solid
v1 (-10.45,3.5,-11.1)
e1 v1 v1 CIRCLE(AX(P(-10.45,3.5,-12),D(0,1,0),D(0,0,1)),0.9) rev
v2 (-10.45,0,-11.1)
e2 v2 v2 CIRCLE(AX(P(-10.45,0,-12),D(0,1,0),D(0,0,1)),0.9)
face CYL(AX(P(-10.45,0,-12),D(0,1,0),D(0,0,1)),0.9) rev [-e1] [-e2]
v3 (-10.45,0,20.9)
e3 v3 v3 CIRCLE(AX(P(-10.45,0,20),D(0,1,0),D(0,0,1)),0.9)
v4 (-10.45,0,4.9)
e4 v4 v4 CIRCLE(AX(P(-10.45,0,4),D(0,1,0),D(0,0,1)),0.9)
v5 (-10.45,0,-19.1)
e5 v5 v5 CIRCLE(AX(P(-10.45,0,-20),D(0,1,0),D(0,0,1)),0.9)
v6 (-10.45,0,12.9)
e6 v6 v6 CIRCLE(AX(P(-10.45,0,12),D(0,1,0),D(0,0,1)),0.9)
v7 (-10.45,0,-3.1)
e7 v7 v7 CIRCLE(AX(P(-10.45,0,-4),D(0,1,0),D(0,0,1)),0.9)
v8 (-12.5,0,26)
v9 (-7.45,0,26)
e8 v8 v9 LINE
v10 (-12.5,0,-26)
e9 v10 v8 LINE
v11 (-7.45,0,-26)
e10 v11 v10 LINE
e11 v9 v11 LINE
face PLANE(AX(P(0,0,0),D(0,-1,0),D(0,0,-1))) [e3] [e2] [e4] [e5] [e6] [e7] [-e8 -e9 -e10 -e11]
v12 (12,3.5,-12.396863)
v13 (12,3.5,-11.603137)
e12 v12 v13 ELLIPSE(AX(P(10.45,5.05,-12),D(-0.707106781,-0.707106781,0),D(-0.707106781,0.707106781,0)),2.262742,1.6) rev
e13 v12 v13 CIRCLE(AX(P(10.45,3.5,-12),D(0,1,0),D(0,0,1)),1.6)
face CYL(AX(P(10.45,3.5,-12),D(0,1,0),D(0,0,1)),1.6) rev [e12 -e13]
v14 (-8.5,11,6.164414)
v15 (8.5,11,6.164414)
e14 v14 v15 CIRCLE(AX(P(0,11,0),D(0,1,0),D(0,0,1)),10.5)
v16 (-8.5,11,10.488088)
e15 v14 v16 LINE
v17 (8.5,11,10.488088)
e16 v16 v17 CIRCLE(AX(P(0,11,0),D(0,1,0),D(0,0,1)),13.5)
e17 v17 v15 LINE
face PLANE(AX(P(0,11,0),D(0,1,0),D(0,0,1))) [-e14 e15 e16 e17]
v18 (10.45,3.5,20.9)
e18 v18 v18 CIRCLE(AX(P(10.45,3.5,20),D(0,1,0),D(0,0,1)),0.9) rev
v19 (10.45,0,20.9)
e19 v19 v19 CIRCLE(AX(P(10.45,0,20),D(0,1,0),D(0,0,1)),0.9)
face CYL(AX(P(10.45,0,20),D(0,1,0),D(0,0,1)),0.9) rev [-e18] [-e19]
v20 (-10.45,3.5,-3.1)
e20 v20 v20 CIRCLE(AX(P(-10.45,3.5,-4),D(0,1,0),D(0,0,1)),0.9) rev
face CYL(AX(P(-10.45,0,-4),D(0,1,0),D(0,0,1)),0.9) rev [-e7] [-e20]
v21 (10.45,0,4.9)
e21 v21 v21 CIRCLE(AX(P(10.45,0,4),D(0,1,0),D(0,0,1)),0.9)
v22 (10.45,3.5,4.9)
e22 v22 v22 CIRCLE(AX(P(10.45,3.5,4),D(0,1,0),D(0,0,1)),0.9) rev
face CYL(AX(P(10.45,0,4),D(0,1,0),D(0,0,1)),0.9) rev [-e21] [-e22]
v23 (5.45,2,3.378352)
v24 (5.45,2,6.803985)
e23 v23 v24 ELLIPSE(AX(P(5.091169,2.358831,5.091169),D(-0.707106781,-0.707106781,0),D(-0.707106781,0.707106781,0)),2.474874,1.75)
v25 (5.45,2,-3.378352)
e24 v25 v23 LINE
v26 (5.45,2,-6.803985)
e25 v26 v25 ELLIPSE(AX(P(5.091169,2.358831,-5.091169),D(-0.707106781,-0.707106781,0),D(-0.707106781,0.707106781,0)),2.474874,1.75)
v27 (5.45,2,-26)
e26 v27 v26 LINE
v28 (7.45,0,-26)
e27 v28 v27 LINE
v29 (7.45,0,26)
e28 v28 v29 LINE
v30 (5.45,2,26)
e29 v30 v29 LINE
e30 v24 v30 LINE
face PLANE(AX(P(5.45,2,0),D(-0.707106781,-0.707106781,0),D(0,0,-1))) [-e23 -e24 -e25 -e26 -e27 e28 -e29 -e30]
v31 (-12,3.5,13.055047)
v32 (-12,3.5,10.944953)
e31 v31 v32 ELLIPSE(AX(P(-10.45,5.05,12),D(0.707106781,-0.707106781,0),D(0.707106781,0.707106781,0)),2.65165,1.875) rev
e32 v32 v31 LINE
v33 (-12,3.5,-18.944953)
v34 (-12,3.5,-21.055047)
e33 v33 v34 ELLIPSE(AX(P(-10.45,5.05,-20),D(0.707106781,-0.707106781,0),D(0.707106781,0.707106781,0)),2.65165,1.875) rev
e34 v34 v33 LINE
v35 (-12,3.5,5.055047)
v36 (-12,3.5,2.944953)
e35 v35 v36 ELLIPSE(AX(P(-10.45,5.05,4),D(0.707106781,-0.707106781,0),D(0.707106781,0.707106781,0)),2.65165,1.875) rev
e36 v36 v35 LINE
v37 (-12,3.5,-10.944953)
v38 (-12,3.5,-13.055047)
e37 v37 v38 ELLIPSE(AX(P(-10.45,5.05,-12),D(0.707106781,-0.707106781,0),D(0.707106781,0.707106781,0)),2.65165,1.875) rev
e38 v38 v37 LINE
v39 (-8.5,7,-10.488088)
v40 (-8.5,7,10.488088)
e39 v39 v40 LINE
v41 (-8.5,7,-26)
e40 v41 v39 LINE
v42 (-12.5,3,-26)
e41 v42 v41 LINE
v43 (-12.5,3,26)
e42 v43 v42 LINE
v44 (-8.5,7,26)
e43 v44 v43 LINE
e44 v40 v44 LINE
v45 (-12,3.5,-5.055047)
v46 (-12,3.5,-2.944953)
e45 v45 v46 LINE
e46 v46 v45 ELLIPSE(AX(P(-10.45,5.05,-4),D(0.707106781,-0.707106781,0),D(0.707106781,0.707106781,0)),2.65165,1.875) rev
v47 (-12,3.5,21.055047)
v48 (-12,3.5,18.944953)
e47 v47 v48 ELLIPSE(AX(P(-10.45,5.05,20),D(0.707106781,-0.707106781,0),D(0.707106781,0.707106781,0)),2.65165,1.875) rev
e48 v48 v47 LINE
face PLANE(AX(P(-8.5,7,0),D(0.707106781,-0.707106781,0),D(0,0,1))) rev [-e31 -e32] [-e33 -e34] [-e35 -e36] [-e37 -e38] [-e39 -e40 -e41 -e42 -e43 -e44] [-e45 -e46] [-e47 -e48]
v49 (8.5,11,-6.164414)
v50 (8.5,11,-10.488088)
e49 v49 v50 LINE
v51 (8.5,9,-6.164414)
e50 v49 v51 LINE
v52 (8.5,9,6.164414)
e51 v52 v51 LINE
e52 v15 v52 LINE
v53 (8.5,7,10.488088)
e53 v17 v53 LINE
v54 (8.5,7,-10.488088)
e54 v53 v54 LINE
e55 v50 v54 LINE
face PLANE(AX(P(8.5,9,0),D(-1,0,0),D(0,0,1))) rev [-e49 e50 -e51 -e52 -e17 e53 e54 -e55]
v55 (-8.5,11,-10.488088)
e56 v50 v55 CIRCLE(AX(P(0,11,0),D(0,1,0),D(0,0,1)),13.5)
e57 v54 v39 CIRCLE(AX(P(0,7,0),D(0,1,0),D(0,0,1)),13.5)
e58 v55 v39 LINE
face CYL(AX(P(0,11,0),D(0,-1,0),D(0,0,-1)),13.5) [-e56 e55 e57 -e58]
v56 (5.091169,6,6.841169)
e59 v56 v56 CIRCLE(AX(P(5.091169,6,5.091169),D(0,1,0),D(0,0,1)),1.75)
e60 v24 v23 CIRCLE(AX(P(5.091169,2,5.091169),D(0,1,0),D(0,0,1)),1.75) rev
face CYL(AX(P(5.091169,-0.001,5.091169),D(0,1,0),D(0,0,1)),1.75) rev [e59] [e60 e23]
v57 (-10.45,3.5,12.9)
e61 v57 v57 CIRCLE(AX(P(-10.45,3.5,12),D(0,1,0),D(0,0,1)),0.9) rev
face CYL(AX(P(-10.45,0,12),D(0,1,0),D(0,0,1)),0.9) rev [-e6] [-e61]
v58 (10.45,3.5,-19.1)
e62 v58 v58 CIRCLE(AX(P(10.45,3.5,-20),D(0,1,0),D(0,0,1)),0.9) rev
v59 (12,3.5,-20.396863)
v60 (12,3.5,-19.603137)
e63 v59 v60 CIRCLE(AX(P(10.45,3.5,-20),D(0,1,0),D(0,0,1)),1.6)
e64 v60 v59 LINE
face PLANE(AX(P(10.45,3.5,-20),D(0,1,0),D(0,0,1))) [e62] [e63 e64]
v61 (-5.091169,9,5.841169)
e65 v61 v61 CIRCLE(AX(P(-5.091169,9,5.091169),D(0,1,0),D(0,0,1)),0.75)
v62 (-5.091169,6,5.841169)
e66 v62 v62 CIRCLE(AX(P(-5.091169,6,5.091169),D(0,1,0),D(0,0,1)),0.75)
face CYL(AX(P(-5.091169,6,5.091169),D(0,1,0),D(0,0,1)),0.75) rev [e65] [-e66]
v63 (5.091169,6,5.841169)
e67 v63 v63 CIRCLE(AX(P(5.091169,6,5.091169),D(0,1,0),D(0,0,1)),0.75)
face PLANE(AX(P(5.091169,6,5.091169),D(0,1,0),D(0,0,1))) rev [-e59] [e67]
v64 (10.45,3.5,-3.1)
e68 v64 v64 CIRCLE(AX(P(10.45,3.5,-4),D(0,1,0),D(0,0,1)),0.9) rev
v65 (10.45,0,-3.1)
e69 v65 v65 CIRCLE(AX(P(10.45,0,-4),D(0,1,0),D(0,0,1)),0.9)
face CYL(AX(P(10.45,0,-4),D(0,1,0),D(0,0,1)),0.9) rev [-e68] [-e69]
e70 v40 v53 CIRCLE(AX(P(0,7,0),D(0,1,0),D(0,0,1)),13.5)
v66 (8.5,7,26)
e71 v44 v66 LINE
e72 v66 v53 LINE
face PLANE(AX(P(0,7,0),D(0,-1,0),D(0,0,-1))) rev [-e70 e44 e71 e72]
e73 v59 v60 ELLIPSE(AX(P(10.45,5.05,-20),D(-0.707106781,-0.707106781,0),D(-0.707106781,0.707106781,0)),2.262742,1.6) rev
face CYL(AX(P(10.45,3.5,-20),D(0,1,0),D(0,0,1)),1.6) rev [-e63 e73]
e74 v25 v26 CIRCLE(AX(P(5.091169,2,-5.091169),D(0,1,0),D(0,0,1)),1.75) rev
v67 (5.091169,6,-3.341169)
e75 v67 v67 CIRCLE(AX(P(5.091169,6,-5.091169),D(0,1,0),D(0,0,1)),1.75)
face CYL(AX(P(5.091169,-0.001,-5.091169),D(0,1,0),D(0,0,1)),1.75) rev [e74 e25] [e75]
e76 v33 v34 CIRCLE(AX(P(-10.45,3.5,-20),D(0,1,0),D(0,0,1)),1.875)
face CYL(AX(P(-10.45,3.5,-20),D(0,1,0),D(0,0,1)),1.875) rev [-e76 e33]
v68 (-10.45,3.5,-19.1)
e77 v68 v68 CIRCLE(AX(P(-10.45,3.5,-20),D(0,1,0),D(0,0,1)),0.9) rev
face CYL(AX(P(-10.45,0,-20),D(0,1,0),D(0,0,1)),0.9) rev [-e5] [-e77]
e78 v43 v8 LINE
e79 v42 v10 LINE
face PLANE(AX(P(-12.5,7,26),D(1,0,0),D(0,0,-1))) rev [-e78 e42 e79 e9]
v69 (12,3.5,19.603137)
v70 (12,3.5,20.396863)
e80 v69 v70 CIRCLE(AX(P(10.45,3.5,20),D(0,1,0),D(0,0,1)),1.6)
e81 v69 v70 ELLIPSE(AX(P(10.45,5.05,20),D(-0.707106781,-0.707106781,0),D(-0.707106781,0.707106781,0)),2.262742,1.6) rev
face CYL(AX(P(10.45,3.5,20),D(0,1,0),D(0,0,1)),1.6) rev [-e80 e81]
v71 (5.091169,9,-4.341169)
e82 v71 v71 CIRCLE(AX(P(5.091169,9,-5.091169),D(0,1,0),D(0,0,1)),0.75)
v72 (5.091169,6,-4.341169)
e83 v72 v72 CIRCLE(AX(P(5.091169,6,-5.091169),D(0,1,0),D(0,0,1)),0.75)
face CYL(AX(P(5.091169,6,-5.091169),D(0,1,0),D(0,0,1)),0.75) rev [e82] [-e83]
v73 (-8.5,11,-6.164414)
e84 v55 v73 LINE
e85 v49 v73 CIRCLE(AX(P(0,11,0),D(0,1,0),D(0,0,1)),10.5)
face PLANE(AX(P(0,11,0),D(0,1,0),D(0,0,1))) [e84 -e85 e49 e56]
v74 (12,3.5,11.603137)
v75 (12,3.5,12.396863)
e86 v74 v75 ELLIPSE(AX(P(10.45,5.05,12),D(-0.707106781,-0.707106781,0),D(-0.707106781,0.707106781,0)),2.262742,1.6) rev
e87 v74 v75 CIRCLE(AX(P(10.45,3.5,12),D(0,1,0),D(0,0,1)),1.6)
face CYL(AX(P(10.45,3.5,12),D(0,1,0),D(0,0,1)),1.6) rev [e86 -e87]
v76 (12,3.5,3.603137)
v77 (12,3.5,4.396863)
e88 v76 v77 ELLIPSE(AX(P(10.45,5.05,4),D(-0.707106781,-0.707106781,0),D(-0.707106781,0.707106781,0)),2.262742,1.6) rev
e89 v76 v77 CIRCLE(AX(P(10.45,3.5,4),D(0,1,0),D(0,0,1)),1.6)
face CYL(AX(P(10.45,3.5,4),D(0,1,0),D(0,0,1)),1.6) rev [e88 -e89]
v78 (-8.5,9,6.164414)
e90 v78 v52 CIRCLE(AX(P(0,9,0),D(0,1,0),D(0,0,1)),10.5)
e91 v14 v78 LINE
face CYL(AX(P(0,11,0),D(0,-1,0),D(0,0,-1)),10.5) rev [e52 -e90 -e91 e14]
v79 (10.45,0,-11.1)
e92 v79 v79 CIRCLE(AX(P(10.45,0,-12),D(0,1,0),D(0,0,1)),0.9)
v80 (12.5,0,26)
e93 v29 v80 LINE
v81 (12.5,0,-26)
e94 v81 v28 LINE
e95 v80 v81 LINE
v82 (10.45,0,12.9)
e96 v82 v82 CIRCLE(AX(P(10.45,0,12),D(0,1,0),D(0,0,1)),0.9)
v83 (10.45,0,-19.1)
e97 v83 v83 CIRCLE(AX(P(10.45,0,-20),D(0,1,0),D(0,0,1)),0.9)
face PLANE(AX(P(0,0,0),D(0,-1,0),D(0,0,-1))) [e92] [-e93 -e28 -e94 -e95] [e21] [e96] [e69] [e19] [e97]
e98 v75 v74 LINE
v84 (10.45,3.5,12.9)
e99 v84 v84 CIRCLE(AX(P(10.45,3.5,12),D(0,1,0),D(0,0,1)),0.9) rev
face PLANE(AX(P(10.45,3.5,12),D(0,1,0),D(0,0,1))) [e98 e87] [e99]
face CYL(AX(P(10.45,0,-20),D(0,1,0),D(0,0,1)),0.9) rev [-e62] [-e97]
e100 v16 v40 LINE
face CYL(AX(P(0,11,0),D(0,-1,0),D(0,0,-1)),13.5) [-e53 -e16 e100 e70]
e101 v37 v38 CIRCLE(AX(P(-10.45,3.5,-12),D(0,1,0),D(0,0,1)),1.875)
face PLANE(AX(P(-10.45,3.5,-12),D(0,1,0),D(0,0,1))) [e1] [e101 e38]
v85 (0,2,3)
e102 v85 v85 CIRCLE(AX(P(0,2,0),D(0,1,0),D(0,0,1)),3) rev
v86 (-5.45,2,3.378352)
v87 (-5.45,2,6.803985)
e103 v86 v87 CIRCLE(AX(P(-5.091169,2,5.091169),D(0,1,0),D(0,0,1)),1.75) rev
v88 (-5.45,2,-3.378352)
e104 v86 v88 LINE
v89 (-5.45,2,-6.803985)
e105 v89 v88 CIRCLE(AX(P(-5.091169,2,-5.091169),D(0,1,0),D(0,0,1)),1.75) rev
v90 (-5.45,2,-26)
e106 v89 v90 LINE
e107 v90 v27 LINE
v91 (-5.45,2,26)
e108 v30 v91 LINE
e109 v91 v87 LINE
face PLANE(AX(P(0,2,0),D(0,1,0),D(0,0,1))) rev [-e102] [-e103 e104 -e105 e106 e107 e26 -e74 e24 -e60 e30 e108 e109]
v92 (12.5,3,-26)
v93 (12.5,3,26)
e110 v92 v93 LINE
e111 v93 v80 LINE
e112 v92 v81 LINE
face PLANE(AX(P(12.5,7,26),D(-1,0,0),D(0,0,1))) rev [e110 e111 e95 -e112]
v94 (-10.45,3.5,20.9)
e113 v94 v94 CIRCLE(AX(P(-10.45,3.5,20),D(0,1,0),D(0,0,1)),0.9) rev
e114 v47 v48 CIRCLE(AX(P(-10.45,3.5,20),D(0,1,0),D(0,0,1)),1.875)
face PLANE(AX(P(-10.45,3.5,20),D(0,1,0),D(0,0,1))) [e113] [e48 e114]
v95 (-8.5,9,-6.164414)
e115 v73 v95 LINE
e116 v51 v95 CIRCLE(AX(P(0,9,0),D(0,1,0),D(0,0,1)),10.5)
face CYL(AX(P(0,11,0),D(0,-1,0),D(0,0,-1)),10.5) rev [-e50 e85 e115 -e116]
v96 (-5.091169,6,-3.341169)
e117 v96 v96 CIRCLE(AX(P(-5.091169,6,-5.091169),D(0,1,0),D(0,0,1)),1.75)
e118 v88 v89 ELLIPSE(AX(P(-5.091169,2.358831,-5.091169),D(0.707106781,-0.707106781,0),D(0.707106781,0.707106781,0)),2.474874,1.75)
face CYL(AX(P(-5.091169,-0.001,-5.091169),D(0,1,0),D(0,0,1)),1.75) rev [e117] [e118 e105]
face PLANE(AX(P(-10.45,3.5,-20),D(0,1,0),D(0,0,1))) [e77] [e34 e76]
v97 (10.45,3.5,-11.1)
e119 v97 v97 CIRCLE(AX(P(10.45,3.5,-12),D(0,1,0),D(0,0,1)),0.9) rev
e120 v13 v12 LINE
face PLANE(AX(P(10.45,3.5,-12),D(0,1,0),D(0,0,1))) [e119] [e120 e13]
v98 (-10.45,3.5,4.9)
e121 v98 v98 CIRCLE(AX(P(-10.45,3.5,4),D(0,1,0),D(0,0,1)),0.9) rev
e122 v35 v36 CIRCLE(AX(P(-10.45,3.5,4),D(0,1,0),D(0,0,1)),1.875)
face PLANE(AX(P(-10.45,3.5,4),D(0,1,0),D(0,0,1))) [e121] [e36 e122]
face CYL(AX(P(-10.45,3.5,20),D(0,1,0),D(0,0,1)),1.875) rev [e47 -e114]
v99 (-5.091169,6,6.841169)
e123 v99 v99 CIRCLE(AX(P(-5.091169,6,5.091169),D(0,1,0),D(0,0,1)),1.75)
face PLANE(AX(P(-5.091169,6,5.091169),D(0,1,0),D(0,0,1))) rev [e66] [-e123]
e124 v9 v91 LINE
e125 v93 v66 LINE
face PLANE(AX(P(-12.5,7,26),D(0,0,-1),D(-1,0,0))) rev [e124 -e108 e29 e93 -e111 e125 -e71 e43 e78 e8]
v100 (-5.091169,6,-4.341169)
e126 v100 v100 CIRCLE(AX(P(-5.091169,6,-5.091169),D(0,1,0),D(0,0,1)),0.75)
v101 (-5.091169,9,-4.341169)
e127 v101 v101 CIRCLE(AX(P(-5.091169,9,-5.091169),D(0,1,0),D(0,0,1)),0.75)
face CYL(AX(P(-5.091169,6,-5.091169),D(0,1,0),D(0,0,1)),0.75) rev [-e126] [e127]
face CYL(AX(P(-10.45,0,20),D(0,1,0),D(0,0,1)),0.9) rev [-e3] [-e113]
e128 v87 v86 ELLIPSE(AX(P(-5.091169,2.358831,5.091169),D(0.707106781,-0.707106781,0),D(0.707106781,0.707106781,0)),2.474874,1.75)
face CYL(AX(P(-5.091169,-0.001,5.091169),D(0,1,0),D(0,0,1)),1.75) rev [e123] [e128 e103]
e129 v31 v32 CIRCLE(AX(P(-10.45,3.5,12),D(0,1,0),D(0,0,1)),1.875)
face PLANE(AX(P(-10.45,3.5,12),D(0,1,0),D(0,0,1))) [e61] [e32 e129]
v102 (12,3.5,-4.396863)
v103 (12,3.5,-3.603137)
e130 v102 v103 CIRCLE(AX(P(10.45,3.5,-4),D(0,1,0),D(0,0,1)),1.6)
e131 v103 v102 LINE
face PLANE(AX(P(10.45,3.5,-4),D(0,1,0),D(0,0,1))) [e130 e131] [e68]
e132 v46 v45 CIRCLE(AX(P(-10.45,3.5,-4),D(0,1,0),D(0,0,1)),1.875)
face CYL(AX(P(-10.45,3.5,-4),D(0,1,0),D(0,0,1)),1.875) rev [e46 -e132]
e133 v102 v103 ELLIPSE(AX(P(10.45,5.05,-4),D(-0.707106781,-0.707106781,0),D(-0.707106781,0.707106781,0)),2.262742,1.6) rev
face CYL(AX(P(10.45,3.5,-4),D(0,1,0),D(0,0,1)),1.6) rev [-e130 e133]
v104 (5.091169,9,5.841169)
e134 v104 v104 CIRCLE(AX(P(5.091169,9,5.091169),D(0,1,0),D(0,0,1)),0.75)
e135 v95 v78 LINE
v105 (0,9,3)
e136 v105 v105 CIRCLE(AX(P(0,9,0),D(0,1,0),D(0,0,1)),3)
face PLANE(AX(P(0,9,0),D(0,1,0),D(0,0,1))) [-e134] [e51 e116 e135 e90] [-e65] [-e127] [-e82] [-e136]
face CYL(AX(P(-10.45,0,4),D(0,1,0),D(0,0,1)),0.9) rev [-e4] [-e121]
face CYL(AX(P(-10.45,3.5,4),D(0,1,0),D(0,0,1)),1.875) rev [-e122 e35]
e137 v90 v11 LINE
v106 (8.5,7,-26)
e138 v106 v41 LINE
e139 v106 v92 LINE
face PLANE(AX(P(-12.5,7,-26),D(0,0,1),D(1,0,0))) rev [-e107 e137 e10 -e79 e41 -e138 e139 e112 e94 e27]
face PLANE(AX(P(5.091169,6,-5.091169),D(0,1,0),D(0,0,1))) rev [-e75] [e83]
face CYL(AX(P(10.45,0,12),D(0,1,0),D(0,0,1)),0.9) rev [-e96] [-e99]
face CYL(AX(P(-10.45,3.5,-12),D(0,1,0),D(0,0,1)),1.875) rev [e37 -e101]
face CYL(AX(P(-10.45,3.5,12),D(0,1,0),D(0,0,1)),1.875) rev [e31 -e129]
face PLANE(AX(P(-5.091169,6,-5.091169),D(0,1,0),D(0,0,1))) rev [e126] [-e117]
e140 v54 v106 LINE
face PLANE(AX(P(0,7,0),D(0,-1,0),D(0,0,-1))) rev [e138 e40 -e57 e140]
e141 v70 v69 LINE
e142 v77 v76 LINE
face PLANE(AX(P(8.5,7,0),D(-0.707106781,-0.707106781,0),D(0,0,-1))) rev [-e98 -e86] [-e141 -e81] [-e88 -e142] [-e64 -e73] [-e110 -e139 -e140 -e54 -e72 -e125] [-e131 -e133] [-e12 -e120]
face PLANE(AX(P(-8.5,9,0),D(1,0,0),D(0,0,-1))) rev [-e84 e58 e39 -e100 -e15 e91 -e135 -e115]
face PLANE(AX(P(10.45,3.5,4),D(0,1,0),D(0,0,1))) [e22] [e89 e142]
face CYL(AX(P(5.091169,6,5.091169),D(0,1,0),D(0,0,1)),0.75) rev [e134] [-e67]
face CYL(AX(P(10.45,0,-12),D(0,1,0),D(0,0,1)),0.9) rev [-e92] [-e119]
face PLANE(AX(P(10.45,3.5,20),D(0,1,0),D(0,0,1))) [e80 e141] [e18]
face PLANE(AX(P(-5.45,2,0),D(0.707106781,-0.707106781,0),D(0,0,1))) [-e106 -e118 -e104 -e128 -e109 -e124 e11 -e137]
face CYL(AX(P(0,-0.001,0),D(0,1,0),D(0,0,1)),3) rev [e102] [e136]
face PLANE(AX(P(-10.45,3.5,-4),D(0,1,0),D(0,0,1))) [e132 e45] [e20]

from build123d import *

# Parameters (mm, degrees)
SKETCH1_W           = 25
SKETCH1_H           = 52
BOSS_EXTRUDE1_DEPTH = 7
SKETCH2_R           = 0.9
CUT_EXTRUDE1_DEPTH  = 30.685855218
LPATTERN1_COUNT     = 6
LPATTERN1_PITCH     = 8
SKETCH9_R           = 1.875
SKETCH9_R_2         = 1.6
CUT_EXTRUDE3_DEPTH  = 3.5
LPATTERN2_COUNT     = 6
LPATTERN2_PITCH     = 8
CHAMFER2_SIZE       = 4
SKETCH10_W          = 14.9
SKETCH10_H          = 52
CUT_EXTRUDE4_DEPTH  = 2
CHAMFER3_SIZE       = 2
BOSS_EXTRUDE2_DEPTH = 2
BOSS_EXTRUDE3_DEPTH = 4
SKETCH13_R          = 0.75
CUT_EXTRUDE5_DEPTH  = 3
CUT_EXTRUDE6_REACH  = 31.466
SKETCH14_R          = 1.75
CUT_EXTRUDE7_REACH  = 32.22
SKETCH15_R          = 3


# Some blends are built 0.0001 mm under size
with BuildPart() as part:
    # Sketch1 → Boss-Extrude1 (new body)
    with BuildSketch(Plane(origin=(0, 0, 0), x_dir=(1, 0, 0), z_dir=(0, 1, 0))):
        Rectangle(SKETCH1_W, SKETCH1_H)
    extrude(amount=BOSS_EXTRUDE1_DEPTH)

    # Sketch2 → Cut-Extrude1 (cut, through all)
    with BuildSketch(Plane(origin=(0, 7, 0), x_dir=(1, 0, 0), z_dir=(0, 1, 0))):
        with Locations(Location((-10.45, -20, 0), (0, 0, 270))):
            Circle(SKETCH2_R)
        with Locations(Location((10.45, -20, 0), (0, 0, 270))):
            Circle(SKETCH2_R)
    cut_extrude1 = extrude(amount=-CUT_EXTRUDE1_DEPTH, mode=Mode.SUBTRACT)

    # LPattern1: Cut-Extrude1 ×6
    with Locations(*[(0, 0, -i * LPATTERN1_PITCH) for i in range(1, LPATTERN1_COUNT)]):
        add(cut_extrude1, mode=Mode.SUBTRACT)

    # Sketch9 → Cut-Extrude3 (cut)
    with BuildSketch(Plane(origin=(0, 7, 0), x_dir=(1, 0, 0), z_dir=(0, 1, 0))):
        with Locations(Location((-10.45, 20, 0), (0, 0, 270))):
            Circle(SKETCH9_R)
        with Locations(Location((10.45, 20, 0), (0, 0, 270))):
            Circle(SKETCH9_R_2)
    cut_extrude3 = extrude(amount=-CUT_EXTRUDE3_DEPTH, mode=Mode.SUBTRACT)

    # LPattern2: Cut-Extrude3 ×6
    with Locations(*[(0, 0, i * LPATTERN2_PITCH) for i in range(1, LPATTERN2_COUNT)]):
        add(cut_extrude3, mode=Mode.SUBTRACT)

    # Chamfer2
    # the kernel refuses this chamfer: 4 mm, written as the material it takes off along each edge
    with BuildSketch(Plane(origin=(-12.5, 7, -36.286731952), x_dir=(-0.027495876610586487, -0.9996219169112968, 0), z_dir=(0, 0, 1)), Plane(origin=(12.5, 7, 36.286731952), x_dir=(0.027495876610586487, -0.9996219169112968, 0), z_dir=(0, 0, -1))) as chamfer2_piece_1:
        Polygon((CHAMFER2_SIZE * 0.999621916911, CHAMFER2_SIZE * 0.0274958766106), (-CHAMFER2_SIZE * 0.0274958766106, CHAMFER2_SIZE * 0.999621916911), (0, 0), align=None)
    extrude(amount=72.573463904, mode=Mode.SUBTRACT)

    # Sketch10 → Cut-Extrude4 (cut)
    with BuildSketch(Plane.XZ):
        Rectangle(SKETCH10_W, SKETCH10_H)
    extrude(amount=-CUT_EXTRUDE4_DEPTH, mode=Mode.SUBTRACT)

    # Chamfer3
    chamfer3_edges = [part.edges().sort_by_distance(p)[0] for p in [
        (7.45, 2, 0),
        (-7.45, 2, 0),
    ]]
    chamfer(chamfer3_edges, length=CHAMFER3_SIZE - 0.0001)  # a hair under: the kernel refuses the full size

    # Sketch12 → Boss-Extrude2 (add)
    with BuildSketch(Plane(origin=(0, 7, 0), x_dir=(1, 0, 0), z_dir=(0, 1, 0))):
        with BuildLine():
            ThreePointArc((8.5, 6.164414003), (0, 10.5), (-8.5, 6.164414003))
            Line((-8.5, 6.164414003), (-8.5, -6.164414003))
            ThreePointArc((-8.5, -6.164414003), (0, -10.5), (8.5, -6.164414003))
            Line((8.5, -6.164414003), (8.5, 6.164414003))
        make_face()
    extrude(amount=BOSS_EXTRUDE2_DEPTH)

    # Sketch12<3> → Boss-Extrude3 (add)
    with BuildSketch(Plane(origin=(0, 7, 0), x_dir=(1, 0, 0), z_dir=(0, 1, 0))):
        with BuildLine():
            ThreePointArc((8.5, 10.488088482), (0, 13.5), (-8.5, 10.488088482))
            Line((-8.5, 10.488088482), (-8.5, 6.164414003))
            ThreePointArc((-8.5, 6.164414003), (0, 10.5), (8.5, 6.164414003))
            Line((8.5, 6.164414003), (8.5, 10.488088482))
        make_face()
        with BuildLine():
            Line((-8.5, -6.164414003), (-8.5, -10.488088482))
            ThreePointArc((-8.5, -10.488088482), (0, -13.5), (8.5, -10.488088482))
            Line((8.5, -10.488088482), (8.5, -6.164414003))
            ThreePointArc((8.5, -6.164414003), (0, -10.5), (-8.5, -6.164414003))
        make_face()
    extrude(amount=BOSS_EXTRUDE3_DEPTH)

    # Sketch13 → Cut-Extrude5 (cut)
    with BuildSketch(Plane(origin=(0, 9, 0), x_dir=(1, 0, 0), z_dir=(0, 1, 0))):
        with Locations(Location((-5.091168825, 5.091168825, 0), (0, 0, 270))):
            Circle(SKETCH13_R)
        with Locations(Location((5.091168825, 5.091168825, 0), (0, 0, 270))):
            Circle(SKETCH13_R)
        with Locations(Location((5.091168825, -5.091168825, 0), (0, 0, 270))):
            Circle(SKETCH13_R)
        with Locations(Location((-5.091168825, -5.091168825, 0), (0, 0, 270))):
            Circle(SKETCH13_R)
    extrude(amount=-CUT_EXTRUDE5_DEPTH, mode=Mode.SUBTRACT)

    # Sketch14 → Cut-Extrude6 (cut, up to next)
    with BuildSketch(Plane(origin=(0, 6, 0), x_dir=(1, 0, 0), z_dir=(0, 1, 0)), mode=Mode.PRIVATE) as cut_extrude6_sk1:
        with Locations(Location((-5.091168825, 5.091168825, 0), (0, 0, 270))):
            Circle(SKETCH14_R)
    cut_extrude6_tool1 = extrude(cut_extrude6_sk1.sketch, amount=-CUT_EXTRUDE6_REACH, mode=Mode.PRIVATE) & part.part
    # Sketch14 → Cut-Extrude6 (cut, up to next)
    with BuildSketch(Plane(origin=(0, 6, 0), x_dir=(1, 0, 0), z_dir=(0, 1, 0)), mode=Mode.PRIVATE) as cut_extrude6_sk2:
        with Locations(Location((5.091168825, 5.091168825, 0), (0, 0, 270))):
            Circle(SKETCH14_R)
    cut_extrude6_tool2 = extrude(cut_extrude6_sk2.sketch, amount=-CUT_EXTRUDE6_REACH, mode=Mode.PRIVATE) & part.part
    # Sketch14 → Cut-Extrude6 (cut, up to next)
    with BuildSketch(Plane(origin=(0, 6, 0), x_dir=(1, 0, 0), z_dir=(0, 1, 0)), mode=Mode.PRIVATE) as cut_extrude6_sk3:
        with Locations(Location((5.091168825, -5.091168825, 0), (0, 0, 270))):
            Circle(SKETCH14_R)
    cut_extrude6_tool3 = extrude(cut_extrude6_sk3.sketch, amount=-CUT_EXTRUDE6_REACH, mode=Mode.PRIVATE) & part.part
    # Sketch14 → Cut-Extrude6 (cut, up to next)
    with BuildSketch(Plane(origin=(0, 6, 0), x_dir=(1, 0, 0), z_dir=(0, 1, 0)), mode=Mode.PRIVATE) as cut_extrude6_sk4:
        with Locations(Location((-5.091168825, -5.091168825, 0), (0, 0, 270))):
            Circle(SKETCH14_R)
    cut_extrude6_tool4 = extrude(cut_extrude6_sk4.sketch, amount=-CUT_EXTRUDE6_REACH, mode=Mode.PRIVATE) & part.part
    add(cut_extrude6_tool1.solids().sort_by_distance((-5.091169, 6, -5.091169))[0], mode=Mode.SUBTRACT)
    add(cut_extrude6_tool2.solids().sort_by_distance((5.091169, 6, -5.091169))[0], mode=Mode.SUBTRACT)
    add(cut_extrude6_tool3.solids().sort_by_distance((5.091169, 6, 5.091169))[0], mode=Mode.SUBTRACT)
    add(cut_extrude6_tool4.solids().sort_by_distance((-5.091169, 6, 5.091169))[0], mode=Mode.SUBTRACT)

    # Sketch15 → Cut-Extrude7 (cut, up to next)
    with BuildSketch(Plane(origin=(0, 9, 0), x_dir=(1, 0, 0), z_dir=(0, 1, 0)), mode=Mode.PRIVATE) as cut_extrude7_sk1:
        with Locations(Location((0, 0, 0), (0, 0, 270))):
            Circle(SKETCH15_R)
    cut_extrude7_tool1 = extrude(cut_extrude7_sk1.sketch, amount=-CUT_EXTRUDE7_REACH, mode=Mode.PRIVATE) & part.part
    add(cut_extrude7_tool1.solids().sort_by_distance((0, 9, 0))[0], mode=Mode.SUBTRACT)


solid = part.part
